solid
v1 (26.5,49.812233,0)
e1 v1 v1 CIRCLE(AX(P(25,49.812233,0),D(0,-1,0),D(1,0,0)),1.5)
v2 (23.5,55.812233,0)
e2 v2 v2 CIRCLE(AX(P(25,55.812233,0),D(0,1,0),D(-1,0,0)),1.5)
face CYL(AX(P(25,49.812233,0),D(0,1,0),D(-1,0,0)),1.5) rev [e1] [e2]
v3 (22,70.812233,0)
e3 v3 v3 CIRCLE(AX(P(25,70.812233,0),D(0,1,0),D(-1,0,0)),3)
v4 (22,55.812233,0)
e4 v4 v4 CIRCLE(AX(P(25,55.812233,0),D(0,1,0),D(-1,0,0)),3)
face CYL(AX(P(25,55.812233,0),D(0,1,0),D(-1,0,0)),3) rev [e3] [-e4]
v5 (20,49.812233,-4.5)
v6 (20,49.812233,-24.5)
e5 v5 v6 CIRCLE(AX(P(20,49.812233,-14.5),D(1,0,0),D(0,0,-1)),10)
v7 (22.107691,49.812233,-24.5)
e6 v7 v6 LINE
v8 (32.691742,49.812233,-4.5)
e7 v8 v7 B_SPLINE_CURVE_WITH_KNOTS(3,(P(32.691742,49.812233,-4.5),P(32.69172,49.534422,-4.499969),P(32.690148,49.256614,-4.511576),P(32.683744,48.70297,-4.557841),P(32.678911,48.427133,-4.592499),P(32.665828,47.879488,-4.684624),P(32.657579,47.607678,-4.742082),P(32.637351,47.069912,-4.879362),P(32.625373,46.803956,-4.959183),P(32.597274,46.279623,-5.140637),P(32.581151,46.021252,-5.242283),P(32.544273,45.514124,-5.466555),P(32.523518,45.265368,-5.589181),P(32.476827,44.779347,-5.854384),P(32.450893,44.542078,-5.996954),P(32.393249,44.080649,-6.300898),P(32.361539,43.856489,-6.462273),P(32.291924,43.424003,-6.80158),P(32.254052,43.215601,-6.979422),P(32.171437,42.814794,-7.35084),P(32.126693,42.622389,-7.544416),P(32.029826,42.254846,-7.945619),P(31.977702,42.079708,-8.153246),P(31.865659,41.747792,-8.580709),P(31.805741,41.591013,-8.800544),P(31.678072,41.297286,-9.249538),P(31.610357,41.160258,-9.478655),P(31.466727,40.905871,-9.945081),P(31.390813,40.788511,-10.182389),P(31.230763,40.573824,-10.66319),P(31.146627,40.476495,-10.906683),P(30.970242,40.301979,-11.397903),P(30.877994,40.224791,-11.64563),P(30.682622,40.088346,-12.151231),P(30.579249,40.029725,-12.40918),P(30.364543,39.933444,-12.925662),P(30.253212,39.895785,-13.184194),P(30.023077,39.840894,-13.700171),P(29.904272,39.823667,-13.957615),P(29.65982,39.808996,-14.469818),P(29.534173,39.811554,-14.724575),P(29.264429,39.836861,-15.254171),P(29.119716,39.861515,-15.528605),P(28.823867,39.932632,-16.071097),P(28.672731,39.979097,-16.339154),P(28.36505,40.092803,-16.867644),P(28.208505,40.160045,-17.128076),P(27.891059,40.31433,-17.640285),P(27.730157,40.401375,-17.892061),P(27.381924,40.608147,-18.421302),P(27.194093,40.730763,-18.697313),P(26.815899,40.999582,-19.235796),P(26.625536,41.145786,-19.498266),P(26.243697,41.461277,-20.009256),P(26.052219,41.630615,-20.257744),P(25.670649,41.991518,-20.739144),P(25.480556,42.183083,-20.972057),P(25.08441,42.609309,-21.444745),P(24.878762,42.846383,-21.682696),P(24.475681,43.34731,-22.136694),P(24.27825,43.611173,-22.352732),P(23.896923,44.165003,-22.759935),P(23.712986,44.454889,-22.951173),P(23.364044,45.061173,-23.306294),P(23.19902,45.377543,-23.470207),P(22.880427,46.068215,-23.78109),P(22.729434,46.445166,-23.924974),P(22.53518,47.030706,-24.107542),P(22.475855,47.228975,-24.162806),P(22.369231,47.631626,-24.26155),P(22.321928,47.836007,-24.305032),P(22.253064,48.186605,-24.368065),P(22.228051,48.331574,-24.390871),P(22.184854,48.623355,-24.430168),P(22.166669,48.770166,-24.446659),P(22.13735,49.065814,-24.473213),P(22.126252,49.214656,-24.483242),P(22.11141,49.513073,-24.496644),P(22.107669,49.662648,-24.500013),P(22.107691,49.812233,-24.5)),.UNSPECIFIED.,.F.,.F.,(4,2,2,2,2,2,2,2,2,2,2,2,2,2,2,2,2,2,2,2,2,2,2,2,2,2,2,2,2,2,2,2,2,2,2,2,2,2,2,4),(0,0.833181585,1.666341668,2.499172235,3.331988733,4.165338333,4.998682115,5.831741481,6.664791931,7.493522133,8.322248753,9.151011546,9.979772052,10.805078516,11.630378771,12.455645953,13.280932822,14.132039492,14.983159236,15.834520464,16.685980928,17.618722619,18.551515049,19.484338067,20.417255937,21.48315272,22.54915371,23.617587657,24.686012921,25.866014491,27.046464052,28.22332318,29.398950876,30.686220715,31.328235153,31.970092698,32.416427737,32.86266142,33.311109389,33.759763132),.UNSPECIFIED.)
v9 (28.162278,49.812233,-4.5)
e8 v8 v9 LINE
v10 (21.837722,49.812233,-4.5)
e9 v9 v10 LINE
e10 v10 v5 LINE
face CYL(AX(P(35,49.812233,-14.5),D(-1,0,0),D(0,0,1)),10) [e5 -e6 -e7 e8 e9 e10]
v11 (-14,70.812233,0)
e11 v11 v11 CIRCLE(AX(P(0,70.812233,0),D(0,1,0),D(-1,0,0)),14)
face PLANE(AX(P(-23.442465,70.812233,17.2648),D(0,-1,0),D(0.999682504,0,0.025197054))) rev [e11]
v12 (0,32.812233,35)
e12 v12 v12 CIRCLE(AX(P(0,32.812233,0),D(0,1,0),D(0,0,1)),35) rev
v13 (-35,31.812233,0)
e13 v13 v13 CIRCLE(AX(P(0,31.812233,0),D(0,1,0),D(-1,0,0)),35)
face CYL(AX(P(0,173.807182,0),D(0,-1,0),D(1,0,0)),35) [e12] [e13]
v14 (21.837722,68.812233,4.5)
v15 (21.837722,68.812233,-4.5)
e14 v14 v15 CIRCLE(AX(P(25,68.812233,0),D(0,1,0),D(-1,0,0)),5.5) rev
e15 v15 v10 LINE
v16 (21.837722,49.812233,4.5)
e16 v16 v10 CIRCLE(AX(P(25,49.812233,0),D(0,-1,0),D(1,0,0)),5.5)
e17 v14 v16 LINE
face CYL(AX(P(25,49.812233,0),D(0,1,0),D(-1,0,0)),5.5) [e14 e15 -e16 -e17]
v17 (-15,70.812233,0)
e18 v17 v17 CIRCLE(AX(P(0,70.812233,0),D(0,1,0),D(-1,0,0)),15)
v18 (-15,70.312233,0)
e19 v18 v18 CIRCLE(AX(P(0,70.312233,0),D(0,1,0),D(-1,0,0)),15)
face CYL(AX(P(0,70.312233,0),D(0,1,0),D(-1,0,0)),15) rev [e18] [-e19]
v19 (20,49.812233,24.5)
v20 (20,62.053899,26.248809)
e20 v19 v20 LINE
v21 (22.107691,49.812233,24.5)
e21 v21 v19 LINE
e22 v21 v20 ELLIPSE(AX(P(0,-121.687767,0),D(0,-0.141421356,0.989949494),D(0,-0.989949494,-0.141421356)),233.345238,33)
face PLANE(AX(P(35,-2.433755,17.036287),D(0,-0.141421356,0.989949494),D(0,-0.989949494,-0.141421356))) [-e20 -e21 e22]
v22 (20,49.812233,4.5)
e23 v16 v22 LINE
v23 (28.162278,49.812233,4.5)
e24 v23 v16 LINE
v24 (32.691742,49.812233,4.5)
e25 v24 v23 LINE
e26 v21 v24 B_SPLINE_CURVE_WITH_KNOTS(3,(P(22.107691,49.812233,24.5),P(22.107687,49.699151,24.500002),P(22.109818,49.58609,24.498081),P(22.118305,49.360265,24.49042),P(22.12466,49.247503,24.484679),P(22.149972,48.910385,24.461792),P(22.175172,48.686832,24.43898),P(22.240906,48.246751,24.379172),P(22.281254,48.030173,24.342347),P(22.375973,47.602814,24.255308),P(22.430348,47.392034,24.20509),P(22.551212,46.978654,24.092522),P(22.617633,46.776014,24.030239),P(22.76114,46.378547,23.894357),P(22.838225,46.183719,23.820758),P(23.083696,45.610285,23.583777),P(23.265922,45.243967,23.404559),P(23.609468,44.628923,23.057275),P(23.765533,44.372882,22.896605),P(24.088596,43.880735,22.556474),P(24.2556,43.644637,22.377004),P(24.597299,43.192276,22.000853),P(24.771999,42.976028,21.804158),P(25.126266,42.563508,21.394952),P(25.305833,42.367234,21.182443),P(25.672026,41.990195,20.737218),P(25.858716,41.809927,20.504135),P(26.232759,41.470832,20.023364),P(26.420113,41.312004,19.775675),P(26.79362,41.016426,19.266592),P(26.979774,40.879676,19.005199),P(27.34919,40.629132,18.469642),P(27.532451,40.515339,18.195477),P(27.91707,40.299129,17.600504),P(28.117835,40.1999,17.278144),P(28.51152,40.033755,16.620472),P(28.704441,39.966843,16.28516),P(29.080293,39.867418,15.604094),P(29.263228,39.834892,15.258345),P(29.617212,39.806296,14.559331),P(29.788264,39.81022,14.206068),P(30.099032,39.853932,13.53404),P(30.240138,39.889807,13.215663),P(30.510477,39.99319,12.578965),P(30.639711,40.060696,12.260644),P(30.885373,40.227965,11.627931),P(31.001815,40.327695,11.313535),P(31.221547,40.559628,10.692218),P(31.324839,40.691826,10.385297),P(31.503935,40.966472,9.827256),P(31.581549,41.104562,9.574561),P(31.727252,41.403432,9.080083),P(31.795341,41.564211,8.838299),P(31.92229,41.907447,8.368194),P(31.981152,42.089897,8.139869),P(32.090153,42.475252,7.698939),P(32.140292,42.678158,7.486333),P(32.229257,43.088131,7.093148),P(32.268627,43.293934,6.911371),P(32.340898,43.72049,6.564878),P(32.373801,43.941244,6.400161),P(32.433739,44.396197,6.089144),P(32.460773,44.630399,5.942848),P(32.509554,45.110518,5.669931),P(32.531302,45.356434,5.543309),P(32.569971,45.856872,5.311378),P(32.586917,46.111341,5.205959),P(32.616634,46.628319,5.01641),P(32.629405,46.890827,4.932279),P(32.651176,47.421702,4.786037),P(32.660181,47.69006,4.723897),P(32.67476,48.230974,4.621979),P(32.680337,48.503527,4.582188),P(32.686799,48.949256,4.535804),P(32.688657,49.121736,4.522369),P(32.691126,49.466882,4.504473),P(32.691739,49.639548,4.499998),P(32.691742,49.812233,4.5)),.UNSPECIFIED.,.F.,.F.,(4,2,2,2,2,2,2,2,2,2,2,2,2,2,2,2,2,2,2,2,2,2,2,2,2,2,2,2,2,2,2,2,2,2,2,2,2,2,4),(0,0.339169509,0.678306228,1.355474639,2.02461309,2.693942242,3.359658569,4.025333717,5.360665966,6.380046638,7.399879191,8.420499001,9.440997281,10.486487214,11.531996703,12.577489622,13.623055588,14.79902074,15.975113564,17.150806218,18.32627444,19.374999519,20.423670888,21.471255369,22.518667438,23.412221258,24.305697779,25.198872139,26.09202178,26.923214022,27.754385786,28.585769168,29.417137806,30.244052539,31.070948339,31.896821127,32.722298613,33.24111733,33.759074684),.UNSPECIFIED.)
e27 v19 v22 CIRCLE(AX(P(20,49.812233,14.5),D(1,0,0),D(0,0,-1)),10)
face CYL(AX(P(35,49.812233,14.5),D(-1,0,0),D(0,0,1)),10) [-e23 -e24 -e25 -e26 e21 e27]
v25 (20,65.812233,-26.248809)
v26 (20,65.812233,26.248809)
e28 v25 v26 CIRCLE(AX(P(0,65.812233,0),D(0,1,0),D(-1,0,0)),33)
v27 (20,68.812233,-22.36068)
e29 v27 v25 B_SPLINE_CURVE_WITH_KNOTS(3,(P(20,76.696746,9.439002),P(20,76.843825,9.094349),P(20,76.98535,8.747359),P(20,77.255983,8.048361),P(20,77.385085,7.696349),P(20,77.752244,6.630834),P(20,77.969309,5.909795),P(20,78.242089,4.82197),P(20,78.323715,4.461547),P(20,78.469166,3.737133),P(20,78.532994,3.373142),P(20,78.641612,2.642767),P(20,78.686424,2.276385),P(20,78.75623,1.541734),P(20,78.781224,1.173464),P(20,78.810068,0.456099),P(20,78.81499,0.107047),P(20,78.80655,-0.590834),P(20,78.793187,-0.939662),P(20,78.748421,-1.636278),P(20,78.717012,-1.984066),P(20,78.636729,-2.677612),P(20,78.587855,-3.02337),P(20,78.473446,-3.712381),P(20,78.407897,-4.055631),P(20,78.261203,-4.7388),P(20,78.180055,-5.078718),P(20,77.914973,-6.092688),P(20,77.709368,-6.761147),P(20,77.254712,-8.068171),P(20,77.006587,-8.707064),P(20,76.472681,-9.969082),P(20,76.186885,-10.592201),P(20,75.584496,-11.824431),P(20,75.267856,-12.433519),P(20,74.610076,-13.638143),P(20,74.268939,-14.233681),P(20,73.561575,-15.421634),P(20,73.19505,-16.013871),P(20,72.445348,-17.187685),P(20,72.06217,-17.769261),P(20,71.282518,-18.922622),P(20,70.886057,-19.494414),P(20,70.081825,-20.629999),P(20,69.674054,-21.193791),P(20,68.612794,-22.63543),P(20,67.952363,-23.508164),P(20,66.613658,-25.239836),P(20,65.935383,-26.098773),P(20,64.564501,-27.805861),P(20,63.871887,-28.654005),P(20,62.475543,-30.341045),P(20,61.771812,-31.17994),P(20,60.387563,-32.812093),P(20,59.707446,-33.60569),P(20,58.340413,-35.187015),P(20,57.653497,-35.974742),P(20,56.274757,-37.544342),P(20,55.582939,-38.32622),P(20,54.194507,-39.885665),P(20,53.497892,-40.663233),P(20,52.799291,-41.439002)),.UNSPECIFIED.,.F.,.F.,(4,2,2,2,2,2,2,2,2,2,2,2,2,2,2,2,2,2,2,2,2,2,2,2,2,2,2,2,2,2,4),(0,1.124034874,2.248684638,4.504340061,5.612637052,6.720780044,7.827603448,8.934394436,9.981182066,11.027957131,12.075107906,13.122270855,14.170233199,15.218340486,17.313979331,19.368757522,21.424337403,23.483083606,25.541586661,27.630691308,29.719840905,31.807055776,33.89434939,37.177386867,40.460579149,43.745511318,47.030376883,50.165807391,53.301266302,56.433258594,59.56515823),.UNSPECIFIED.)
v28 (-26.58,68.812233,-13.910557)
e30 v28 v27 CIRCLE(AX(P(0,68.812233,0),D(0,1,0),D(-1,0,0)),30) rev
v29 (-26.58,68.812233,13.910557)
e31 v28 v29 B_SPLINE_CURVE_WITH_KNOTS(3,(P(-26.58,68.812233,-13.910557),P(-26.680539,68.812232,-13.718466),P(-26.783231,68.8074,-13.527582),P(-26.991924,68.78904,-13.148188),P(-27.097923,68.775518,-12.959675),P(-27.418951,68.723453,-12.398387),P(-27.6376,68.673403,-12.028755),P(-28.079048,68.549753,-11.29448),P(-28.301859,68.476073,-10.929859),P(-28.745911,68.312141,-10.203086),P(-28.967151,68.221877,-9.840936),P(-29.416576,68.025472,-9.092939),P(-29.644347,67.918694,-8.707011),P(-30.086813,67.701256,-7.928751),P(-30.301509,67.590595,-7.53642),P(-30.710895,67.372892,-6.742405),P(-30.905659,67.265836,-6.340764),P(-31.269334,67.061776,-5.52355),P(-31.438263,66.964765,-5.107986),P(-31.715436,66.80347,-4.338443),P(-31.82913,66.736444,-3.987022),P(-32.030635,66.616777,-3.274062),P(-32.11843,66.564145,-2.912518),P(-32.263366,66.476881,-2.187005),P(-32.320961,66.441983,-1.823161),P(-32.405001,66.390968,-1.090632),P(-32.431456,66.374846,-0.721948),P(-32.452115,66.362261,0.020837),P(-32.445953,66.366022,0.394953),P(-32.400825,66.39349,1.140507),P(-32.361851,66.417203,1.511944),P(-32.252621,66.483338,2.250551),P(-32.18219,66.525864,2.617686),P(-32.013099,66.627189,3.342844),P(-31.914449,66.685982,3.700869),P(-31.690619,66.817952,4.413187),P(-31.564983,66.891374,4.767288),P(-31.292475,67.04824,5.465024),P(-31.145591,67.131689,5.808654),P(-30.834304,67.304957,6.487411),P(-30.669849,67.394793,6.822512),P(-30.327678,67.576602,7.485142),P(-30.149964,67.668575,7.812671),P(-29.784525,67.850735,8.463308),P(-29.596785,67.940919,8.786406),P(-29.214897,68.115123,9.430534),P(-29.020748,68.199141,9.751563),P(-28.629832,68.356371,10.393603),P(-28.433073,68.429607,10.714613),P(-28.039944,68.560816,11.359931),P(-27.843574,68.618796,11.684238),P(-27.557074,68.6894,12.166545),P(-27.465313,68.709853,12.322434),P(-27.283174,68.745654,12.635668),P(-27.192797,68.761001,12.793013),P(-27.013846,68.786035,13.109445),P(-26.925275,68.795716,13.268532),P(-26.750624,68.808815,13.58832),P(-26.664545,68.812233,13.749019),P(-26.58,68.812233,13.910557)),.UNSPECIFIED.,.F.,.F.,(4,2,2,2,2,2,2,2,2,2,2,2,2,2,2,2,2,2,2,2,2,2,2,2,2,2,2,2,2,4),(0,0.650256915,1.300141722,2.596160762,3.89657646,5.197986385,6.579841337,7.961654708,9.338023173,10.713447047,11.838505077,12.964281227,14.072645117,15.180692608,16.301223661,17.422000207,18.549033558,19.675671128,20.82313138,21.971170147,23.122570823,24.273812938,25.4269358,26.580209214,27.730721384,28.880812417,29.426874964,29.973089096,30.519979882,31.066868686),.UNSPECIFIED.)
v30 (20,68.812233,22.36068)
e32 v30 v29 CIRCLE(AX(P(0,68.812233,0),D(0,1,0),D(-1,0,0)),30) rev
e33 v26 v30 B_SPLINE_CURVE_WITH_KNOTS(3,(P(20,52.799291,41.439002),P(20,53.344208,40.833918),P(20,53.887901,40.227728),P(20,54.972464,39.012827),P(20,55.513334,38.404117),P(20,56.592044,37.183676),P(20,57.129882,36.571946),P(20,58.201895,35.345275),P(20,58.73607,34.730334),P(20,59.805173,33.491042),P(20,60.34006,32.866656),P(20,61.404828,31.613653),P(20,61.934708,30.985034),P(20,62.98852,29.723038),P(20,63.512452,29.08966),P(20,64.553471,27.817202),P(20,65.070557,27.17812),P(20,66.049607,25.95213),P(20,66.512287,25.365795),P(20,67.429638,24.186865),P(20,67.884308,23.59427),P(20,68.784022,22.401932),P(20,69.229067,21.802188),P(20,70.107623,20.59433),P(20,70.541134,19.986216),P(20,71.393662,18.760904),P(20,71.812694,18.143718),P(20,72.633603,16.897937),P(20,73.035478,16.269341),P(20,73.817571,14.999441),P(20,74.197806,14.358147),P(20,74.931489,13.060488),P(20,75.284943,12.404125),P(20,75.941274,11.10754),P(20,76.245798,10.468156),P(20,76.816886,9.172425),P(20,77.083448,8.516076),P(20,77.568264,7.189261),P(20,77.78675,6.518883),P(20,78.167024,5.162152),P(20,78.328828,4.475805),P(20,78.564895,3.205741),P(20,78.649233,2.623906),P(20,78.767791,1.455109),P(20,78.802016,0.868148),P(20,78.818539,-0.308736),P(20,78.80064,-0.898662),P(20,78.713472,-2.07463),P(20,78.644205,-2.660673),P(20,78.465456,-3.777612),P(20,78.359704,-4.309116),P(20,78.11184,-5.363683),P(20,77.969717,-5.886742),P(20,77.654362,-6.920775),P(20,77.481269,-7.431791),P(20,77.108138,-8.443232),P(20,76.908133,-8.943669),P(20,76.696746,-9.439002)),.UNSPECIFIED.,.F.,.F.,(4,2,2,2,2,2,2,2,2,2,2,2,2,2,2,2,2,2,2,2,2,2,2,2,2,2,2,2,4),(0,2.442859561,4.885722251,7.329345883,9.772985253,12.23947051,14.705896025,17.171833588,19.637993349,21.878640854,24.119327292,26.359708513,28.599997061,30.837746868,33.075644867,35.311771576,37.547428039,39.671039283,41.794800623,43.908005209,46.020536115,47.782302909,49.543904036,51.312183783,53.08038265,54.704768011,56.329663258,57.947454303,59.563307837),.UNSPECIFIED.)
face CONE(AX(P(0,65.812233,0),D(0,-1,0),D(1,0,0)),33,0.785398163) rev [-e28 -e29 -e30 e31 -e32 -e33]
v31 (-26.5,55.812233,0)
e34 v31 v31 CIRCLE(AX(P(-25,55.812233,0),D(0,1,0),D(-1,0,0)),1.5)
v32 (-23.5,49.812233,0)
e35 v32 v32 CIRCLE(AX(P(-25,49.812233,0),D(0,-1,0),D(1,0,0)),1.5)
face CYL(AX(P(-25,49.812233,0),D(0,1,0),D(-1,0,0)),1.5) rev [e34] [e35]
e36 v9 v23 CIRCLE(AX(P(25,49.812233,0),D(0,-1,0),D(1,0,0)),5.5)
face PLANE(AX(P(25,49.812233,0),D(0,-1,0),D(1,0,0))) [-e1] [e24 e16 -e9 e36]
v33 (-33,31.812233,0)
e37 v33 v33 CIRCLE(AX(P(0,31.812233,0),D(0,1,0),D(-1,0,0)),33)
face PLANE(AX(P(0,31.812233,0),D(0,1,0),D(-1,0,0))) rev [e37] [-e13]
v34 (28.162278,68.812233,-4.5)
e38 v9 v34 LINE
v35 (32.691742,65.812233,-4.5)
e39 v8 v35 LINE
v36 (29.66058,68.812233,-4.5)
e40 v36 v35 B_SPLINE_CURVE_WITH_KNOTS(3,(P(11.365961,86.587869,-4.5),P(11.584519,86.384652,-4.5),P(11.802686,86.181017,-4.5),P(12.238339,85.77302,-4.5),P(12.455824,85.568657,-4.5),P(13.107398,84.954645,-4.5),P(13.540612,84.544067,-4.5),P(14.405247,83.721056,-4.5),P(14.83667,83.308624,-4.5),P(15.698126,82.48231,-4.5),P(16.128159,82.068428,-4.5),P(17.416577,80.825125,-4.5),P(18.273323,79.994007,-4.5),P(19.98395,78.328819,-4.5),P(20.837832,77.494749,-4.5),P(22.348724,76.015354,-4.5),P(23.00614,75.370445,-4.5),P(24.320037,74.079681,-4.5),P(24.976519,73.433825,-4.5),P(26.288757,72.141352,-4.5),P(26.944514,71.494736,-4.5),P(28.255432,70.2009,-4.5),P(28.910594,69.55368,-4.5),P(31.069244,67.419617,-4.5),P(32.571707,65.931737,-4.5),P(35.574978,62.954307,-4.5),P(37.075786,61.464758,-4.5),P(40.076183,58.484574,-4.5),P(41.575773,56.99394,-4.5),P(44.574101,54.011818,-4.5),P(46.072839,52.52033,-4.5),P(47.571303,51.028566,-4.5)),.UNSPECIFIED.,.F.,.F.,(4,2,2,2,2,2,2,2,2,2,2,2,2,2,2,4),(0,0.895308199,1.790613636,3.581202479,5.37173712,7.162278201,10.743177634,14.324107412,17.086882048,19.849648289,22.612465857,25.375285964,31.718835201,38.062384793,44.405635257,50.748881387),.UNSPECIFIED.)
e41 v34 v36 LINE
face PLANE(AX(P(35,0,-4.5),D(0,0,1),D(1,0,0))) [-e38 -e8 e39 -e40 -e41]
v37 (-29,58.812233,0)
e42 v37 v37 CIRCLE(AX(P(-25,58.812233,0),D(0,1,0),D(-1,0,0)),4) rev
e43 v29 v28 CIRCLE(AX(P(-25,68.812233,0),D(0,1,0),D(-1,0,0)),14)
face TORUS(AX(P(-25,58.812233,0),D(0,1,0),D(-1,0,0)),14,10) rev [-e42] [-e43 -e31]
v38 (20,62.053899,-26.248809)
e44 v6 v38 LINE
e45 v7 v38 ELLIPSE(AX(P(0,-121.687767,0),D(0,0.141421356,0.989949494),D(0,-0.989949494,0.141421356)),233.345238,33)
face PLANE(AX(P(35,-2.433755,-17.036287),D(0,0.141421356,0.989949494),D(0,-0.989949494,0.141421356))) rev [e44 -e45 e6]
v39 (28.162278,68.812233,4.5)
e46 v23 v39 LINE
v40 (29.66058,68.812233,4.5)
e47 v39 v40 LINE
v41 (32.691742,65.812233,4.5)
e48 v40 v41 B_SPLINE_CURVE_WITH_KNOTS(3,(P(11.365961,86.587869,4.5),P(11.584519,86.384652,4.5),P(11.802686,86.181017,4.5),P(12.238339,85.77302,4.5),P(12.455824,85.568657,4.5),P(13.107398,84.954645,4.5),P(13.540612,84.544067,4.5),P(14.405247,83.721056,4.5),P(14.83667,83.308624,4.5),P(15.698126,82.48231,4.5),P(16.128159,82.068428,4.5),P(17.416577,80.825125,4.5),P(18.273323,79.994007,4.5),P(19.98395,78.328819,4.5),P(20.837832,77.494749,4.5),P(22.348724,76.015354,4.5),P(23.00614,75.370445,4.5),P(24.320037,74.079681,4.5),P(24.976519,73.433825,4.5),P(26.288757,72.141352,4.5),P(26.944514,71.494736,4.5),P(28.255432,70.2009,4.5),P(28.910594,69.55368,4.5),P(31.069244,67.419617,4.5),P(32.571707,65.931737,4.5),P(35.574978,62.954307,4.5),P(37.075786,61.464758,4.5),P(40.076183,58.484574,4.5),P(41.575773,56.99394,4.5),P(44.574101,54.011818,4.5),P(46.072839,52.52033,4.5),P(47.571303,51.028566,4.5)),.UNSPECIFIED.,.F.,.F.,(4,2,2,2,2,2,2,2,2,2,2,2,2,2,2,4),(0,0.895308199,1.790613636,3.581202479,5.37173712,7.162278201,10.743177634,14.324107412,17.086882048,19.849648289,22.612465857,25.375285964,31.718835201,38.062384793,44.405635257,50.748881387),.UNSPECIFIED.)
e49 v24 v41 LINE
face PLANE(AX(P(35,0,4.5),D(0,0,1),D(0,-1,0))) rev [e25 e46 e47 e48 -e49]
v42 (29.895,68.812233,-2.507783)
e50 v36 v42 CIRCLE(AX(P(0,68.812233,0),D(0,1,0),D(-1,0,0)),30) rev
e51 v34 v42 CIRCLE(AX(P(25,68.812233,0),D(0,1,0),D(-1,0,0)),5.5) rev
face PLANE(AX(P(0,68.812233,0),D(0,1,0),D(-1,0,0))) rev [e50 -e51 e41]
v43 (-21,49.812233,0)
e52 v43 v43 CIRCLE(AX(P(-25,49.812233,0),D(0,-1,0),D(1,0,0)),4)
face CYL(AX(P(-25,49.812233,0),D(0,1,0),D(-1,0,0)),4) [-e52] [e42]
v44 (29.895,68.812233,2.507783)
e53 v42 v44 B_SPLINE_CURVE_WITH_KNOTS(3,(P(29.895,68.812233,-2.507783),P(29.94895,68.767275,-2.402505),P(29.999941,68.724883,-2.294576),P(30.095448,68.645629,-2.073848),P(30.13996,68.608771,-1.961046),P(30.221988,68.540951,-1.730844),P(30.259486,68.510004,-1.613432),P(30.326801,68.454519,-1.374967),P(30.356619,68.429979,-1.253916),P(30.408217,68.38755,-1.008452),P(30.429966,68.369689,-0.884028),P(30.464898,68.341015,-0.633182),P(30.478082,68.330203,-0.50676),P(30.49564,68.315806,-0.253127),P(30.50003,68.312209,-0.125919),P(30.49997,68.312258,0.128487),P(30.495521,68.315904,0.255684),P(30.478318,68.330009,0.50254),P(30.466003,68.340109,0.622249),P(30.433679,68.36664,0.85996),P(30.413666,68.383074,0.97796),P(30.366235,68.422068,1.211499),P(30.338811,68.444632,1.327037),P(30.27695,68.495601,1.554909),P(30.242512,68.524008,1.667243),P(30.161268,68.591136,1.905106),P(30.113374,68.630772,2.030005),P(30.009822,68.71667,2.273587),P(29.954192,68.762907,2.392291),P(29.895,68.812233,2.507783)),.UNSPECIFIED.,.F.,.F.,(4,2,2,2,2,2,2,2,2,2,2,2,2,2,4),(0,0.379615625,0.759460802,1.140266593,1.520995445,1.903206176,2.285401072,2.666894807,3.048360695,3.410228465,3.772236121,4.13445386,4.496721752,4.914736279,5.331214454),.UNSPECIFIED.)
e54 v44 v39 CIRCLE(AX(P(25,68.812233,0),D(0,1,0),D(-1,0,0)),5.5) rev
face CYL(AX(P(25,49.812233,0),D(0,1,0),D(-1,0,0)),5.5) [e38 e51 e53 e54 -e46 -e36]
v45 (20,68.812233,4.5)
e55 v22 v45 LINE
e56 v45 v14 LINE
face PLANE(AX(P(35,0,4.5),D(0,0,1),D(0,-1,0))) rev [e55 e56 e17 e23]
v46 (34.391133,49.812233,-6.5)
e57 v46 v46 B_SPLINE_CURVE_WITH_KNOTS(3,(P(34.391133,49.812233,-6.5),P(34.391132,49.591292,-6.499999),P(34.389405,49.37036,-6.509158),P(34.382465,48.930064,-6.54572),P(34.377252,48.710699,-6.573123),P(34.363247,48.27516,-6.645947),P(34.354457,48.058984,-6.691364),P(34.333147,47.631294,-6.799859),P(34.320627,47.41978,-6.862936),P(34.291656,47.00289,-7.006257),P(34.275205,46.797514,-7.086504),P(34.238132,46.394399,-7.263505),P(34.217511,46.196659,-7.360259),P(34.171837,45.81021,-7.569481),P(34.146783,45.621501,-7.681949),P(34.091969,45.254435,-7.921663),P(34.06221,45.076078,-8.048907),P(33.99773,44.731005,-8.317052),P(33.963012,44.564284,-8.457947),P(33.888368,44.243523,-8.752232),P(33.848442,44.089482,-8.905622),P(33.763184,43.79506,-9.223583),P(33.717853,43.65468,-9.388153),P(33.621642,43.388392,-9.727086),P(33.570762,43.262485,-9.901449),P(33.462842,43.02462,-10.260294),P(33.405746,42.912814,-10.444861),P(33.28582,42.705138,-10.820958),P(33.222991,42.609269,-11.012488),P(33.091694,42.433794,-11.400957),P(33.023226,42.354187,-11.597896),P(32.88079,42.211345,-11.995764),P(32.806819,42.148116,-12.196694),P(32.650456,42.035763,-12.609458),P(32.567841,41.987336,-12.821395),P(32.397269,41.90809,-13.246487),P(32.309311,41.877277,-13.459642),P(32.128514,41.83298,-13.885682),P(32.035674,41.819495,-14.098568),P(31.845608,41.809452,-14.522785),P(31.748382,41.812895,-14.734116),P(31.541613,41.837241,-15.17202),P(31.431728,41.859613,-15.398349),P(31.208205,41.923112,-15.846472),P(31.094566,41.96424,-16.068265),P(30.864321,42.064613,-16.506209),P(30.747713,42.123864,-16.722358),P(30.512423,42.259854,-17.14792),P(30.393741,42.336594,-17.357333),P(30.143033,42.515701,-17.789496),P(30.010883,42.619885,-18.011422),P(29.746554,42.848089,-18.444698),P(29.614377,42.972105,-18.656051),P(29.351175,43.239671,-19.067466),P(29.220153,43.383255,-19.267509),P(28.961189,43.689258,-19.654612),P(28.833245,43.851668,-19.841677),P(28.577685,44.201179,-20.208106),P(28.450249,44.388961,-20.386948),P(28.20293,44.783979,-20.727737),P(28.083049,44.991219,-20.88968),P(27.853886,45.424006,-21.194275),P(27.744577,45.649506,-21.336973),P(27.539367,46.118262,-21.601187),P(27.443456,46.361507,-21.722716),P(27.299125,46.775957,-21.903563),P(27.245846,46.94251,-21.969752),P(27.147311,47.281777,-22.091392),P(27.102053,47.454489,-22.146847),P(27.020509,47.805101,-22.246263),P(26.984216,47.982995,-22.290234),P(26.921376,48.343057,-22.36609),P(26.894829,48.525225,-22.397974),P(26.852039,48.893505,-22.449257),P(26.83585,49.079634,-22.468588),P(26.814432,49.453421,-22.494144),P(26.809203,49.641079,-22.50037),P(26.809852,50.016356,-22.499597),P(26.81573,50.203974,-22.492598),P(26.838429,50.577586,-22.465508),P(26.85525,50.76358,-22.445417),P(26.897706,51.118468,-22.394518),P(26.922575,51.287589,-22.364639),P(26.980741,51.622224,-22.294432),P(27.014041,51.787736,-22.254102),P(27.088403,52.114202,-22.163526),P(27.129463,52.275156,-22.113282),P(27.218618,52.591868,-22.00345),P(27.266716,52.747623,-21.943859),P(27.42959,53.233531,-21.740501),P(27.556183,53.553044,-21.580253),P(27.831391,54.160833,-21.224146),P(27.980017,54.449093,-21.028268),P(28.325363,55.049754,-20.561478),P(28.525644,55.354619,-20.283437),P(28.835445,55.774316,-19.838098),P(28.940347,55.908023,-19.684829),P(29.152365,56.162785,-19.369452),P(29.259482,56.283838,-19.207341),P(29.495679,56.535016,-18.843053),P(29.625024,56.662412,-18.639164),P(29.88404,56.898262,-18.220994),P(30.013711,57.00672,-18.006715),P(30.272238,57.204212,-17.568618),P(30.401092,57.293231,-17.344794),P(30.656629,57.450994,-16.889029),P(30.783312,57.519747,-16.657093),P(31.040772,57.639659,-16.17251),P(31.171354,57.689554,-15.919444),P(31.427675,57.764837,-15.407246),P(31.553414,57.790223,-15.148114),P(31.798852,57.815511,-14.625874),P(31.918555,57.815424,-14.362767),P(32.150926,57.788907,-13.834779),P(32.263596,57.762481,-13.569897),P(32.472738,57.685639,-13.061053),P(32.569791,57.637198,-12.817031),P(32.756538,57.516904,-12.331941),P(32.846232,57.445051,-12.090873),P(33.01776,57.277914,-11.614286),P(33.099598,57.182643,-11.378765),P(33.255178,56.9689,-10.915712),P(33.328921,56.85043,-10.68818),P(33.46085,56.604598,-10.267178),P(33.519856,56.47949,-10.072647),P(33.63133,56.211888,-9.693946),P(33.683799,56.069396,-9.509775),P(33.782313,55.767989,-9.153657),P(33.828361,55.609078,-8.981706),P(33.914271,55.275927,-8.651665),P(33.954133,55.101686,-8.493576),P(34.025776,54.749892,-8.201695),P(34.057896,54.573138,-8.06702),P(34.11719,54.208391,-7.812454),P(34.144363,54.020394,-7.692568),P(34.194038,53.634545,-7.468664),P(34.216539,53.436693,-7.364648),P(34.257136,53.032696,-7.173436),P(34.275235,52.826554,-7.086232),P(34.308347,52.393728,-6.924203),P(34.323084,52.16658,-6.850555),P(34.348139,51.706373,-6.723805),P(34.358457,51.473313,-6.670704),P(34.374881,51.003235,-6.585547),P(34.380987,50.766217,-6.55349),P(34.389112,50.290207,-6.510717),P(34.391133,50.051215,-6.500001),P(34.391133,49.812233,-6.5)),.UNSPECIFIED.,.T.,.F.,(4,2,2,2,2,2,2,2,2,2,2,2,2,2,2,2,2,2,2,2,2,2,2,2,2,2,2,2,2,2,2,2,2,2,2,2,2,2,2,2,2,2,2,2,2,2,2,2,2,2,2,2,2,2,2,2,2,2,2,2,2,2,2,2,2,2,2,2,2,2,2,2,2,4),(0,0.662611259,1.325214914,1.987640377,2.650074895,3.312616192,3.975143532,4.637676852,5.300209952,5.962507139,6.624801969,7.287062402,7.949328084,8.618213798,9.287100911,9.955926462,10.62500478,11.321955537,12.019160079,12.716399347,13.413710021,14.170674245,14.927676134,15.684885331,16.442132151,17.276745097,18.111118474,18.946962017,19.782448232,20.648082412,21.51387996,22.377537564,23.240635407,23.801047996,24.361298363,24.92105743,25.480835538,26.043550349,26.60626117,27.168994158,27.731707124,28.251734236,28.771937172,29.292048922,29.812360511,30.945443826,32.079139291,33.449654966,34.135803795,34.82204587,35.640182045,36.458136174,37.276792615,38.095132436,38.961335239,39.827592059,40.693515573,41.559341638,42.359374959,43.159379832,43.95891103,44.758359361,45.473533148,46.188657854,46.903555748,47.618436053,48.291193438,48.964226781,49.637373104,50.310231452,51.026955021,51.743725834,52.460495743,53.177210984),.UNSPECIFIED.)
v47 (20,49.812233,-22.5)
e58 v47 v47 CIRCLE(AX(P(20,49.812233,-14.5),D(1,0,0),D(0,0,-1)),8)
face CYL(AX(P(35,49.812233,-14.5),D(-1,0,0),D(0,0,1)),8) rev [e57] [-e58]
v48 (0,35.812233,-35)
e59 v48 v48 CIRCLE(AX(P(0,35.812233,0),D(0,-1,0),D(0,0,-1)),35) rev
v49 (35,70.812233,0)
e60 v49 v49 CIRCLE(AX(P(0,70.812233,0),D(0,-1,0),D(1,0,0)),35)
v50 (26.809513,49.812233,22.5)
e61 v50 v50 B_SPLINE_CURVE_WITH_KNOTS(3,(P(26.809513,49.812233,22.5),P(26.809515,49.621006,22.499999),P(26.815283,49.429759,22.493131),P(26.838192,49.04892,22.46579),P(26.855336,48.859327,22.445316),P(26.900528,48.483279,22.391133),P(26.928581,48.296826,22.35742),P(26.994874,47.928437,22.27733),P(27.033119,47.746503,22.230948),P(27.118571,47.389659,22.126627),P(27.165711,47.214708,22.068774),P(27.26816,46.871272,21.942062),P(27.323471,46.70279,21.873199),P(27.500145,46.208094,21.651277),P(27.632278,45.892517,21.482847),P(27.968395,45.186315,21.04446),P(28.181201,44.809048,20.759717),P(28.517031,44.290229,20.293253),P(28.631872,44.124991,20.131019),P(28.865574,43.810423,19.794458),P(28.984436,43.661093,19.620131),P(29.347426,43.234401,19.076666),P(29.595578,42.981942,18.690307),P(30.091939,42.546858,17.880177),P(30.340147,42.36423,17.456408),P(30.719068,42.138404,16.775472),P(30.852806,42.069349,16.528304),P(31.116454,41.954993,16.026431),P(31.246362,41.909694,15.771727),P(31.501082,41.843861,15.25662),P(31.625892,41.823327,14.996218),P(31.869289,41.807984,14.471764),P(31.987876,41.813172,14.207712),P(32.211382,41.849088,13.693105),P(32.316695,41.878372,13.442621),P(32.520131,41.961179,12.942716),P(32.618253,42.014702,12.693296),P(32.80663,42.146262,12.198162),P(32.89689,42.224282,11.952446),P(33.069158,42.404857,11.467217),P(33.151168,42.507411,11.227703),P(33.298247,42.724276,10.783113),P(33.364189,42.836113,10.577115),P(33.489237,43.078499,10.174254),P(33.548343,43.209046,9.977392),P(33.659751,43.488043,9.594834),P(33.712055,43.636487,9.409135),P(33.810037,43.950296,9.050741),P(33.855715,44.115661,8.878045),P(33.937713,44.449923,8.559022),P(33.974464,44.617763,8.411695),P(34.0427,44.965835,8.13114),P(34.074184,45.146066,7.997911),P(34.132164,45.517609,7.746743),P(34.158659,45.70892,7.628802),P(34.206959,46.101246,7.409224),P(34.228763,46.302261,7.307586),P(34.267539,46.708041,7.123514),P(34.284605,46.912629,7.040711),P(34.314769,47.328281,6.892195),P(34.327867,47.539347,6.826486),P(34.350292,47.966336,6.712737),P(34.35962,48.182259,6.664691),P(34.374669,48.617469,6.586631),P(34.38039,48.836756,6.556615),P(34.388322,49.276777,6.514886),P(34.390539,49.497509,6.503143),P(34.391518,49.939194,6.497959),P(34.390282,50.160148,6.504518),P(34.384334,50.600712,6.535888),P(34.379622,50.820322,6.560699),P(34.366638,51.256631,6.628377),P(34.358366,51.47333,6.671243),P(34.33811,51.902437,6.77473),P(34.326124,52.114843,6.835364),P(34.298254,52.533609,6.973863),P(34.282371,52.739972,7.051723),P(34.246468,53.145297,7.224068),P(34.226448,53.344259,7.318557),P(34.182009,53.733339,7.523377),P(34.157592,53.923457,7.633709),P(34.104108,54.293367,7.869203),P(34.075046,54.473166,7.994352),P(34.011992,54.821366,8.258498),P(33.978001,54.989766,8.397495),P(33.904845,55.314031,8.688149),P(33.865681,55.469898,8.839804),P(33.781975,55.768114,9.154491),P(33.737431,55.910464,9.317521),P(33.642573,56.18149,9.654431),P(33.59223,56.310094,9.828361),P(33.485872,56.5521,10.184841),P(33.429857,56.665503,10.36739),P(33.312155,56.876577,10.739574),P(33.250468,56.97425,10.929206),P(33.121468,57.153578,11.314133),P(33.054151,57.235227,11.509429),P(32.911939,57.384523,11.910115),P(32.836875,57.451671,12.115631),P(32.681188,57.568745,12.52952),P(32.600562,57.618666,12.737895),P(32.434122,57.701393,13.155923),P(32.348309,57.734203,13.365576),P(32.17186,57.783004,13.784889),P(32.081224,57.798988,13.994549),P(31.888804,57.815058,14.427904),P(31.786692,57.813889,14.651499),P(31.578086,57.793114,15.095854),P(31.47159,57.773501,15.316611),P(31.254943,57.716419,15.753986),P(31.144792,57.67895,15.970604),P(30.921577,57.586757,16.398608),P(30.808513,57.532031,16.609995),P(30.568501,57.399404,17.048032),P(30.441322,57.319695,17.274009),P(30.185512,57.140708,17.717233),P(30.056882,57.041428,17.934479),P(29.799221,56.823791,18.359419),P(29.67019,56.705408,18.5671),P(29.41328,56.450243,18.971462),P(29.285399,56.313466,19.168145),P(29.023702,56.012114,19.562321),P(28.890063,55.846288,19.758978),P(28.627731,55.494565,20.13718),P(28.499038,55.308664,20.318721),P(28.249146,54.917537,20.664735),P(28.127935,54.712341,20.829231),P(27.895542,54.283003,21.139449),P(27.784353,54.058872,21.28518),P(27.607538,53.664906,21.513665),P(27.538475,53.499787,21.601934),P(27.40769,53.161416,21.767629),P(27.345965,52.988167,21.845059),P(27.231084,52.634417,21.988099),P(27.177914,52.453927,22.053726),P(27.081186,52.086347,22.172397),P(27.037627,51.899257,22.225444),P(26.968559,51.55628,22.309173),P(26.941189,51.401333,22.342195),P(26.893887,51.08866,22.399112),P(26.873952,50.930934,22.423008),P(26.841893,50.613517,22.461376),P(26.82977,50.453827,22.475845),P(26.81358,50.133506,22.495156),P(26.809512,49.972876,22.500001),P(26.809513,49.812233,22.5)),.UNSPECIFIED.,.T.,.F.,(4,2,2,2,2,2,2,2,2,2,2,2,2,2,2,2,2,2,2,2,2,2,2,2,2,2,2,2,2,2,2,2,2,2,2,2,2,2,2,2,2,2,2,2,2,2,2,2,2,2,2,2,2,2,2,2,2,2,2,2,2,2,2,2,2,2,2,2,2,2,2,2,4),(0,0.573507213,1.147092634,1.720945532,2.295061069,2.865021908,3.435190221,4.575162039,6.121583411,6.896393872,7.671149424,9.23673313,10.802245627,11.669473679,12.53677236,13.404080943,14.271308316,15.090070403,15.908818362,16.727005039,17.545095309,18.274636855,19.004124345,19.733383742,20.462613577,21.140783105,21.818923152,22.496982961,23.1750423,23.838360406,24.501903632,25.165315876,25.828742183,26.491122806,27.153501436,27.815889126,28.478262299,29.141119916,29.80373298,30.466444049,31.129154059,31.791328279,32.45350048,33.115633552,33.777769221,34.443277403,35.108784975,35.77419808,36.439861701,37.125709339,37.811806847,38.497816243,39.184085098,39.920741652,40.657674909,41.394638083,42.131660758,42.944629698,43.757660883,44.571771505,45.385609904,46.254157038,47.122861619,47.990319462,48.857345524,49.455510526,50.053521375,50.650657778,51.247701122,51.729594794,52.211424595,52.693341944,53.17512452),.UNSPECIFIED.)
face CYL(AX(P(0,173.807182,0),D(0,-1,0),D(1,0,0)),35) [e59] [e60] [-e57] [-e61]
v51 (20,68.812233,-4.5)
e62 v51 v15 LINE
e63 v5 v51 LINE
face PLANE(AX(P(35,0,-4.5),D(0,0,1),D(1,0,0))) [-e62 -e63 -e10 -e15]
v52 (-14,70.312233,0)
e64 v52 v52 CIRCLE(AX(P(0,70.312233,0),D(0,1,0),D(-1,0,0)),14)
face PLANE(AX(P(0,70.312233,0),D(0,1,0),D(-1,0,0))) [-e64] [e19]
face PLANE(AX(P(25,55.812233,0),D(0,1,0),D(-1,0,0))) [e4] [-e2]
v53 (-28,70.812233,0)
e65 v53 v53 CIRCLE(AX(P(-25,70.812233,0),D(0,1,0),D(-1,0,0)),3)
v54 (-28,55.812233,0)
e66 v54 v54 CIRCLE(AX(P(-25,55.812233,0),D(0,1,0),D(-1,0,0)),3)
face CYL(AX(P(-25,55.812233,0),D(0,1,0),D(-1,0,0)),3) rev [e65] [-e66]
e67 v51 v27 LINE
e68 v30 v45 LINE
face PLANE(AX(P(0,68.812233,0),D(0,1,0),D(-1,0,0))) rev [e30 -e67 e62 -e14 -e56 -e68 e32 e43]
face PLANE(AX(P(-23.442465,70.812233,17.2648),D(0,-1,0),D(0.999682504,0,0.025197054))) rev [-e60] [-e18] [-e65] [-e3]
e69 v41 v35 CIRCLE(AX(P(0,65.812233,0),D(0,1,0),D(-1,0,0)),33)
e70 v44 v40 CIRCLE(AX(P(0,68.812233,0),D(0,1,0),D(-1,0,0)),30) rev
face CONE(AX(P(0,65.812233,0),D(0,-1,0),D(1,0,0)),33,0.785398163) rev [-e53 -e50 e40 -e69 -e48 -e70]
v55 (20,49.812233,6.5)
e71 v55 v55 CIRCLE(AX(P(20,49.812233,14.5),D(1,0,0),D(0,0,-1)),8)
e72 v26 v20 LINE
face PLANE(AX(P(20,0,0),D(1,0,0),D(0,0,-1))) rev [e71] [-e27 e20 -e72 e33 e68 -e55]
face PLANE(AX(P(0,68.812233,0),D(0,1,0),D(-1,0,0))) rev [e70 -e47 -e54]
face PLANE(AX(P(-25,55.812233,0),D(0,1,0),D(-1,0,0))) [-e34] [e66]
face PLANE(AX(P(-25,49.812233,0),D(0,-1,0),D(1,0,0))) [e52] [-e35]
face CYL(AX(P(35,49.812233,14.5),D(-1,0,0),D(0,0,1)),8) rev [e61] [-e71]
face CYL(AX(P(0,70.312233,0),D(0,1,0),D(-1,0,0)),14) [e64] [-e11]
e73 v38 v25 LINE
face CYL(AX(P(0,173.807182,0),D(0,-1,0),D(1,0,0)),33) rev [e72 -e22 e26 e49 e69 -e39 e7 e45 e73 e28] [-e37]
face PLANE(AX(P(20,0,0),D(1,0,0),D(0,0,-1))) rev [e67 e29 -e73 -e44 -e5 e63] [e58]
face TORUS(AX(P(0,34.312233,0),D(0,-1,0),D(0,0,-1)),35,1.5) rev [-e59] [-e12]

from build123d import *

# Parameters (mm, degrees)
SKETCH2_R           = 35
SKETCH2_R_2         = 33
BOSS_EXTRUDE1_DEPTH = 39
BOSS_EXTRUDE2_START = -2
SKETCH3_R           = 35
BOSS_EXTRUDE2_DEPTH = 2
SKETCH7_R           = 5.5
SKETCH7_R_2         = 1.5
SKETCH7_R_3         = 4
BOSS_EXTRUDE4_DEPTH = 19
SKETCH8_R           = 3
CUT_EXTRUDE3_DEPTH  = 15
CHAMFER1_SIZE       = 3
SKETCH9_R           = 15
SKETCH9_R_2         = 14
CUT_EXTRUDE4_DEPTH  = 0.5
SKETCH10_R          = 1.5
SKETCH11_R          = 8
CUT_EXTRUDE5_DEPTH  = 87.396599101
SKETCH12_R          = 10
SKETCH12_R_2        = 8
BOSS_EXTRUDE5_DEPTH = 15
SKETCH13_R          = 55
SKETCH13_R_2        = 35
CUT_EXTRUDE6_DEPTH  = 64.01587119
FILLET1_R           = 10


with BuildPart() as part:
    # Sketch2 → Boss-Extrude1 (new body)
    with BuildSketch(Plane(origin=(0, 31.812232957, 0), x_dir=(1, 0, 0), z_dir=(0, 1, 0))):
        Circle(SKETCH2_R)
        Circle(SKETCH2_R_2, mode=Mode.SUBTRACT)
    extrude(amount=BOSS_EXTRUDE1_DEPTH)

    # Sketch3 → Boss-Extrude2 (add)
    with BuildSketch(Plane(origin=(0, 70.812232957, 0), x_dir=(1, 0, 0), z_dir=(0, 1, 0)).offset(BOSS_EXTRUDE2_START)):
        Circle(SKETCH3_R)
    extrude(amount=BOSS_EXTRUDE2_DEPTH)

    # Sketch7 → Boss-Extrude4 (add)
    # profile 1 of 2: a face of its own
    with BuildSketch(Plane.XZ.offset(-68.812232957)):
        with Locations(Location((25, 0, 0), (0, 0, 180))):
            Circle(SKETCH7_R)
        with Locations((25, 0)):
            Circle(SKETCH7_R_2, mode=Mode.SUBTRACT)
    # profile 2 of 2: a face of its own
    with BuildSketch(Plane.XZ.offset(-68.812232957)):
        with Locations(Location((-25, 0, 0), (0, 0, 180))):
            Circle(SKETCH7_R_3)
        with Locations((-25, 0)):
            Circle(SKETCH7_R_2, mode=Mode.SUBTRACT)
    extrude(amount=BOSS_EXTRUDE4_DEPTH)

    # Sketch8 → Cut-Extrude3 (cut)
    with BuildSketch(Plane(origin=(0, 70.812232957, 0), x_dir=(1, 0, 0), z_dir=(0, 1, 0))):
        with Locations(Location((25, 0, 0), (0, 0, 180))):
            Circle(SKETCH8_R)
        with Locations(Location((-25, 0, 0), (0, 0, 180))):
            Circle(SKETCH8_R)
    extrude(amount=-CUT_EXTRUDE3_DEPTH, mode=Mode.SUBTRACT)

    # Chamfer1
    # the kernel refuses this chamfer: 3 mm, written as the material it adds along each edge
    with BuildSketch(Plane(origin=(0, 68.812232957, 0), x_dir=(1, 0, 0), z_dir=(0, 0, -1))) as chamfer1_piece_1:
        Polygon((33, CHAMFER1_SIZE), (33 - CHAMFER1_SIZE, 0), (33, 0), align=None)
    revolve(axis=Axis((0, 68.812232957, 0), (0, -1, 0)))

    # Sketch9 → Cut-Extrude4 (cut)
    with BuildSketch(Plane(origin=(0, 70.812232957, 0), x_dir=(1, 0, 0), z_dir=(0, 1, 0))):
        with Locations(Location((0, 0, 0), (0, 0, 180))):
            Circle(SKETCH9_R)
        with Locations(Location((0, 0, 0), (0, 0, 180))):
            Circle(SKETCH9_R_2, mode=Mode.SUBTRACT)
    extrude(amount=-CUT_EXTRUDE4_DEPTH, mode=Mode.SUBTRACT)

    # Sketch10 → Cut-Revolve1 (revolve, cut)
    with BuildSketch(Plane.XY, mode=Mode.PRIVATE) as cut_revolve1_sk:
        with Locations((35, 34.312232957)):
            Circle(SKETCH10_R)
    revolve(cut_revolve1_sk.sketch.rotate(Axis((0, 31.812232957, 0), (0, 1, 0)), 4.795108108), axis=Axis((0, 31.812232957, 0), (0, 1, 0)), mode=Mode.SUBTRACT)

    # Sketch11 → Cut-Extrude5 (cut, through all)
    with BuildSketch(Plane(origin=(0, 0, 0), x_dir=(0, 0, -1), z_dir=(1, 0, 0))):
        with Locations(Location((14.5, 49.812232957, 0), (0, 0, 180))):
            Circle(SKETCH11_R)
        with Locations(Location((-14.5, 49.812232957, 0), (0, 0, 180))):
            Circle(SKETCH11_R)
    extrude(amount=CUT_EXTRUDE5_DEPTH, mode=Mode.SUBTRACT)

    # Sketch12 → Boss-Extrude5 (add)
    # profile 1 of 4: a face of its own
    with BuildSketch(Plane(origin=(20, 0, 0), x_dir=(0, 0, -1), z_dir=(1, 0, 0))):
        with BuildLine():
            Line((-27.5, 70.812232957), (-24.5, 49.812232957))
            ThreePointArc((-24.5, 49.812232957), (-14.5, 59.812232957), (-4.5, 49.812232957))
            Line((-4.5, 49.812232957), (-4.5, 70.812232957))
            Line((-4.5, 70.812232957), (-27.5, 70.812232957))
        make_face()
    # profile 2 of 4: a face of its own
    with BuildSketch(Plane(origin=(20, 0, 0), x_dir=(0, 0, -1), z_dir=(1, 0, 0))):
        with Locations((-14.5, 49.812232957)):
            Circle(SKETCH12_R)
        with Locations((-14.5, 49.812232957)):
            Circle(SKETCH12_R_2, mode=Mode.SUBTRACT)
    # profile 3 of 4: a face of its own
    with BuildSketch(Plane(origin=(20, 0, 0), x_dir=(0, 0, -1), z_dir=(1, 0, 0))):
        with Locations((14.5, 49.812232957)):
            Circle(SKETCH12_R)
        with Locations((14.5, 49.812232957)):
            Circle(SKETCH12_R_2, mode=Mode.SUBTRACT)
    # profile 4 of 4: a face of its own
    with BuildSketch(Plane(origin=(20, 0, 0), x_dir=(0, 0, -1), z_dir=(1, 0, 0))):
        with BuildLine():
            ThreePointArc((4.5, 49.812232957), (14.5, 59.812232957), (24.5, 49.812232957))
            Line((24.5, 49.812232957), (27.5, 70.812232957))
            Line((27.5, 70.812232957), (4.5, 70.812232957))
            Line((4.5, 70.812232957), (4.5, 49.812232957))
        make_face()
    extrude(amount=BOSS_EXTRUDE5_DEPTH)

    # Sketch13 → Cut-Extrude6 (cut, through all)
    with BuildSketch(Plane(origin=(0, 70.812232957, 0), x_dir=(1, 0, 0), z_dir=(0, 1, 0))):
        Circle(SKETCH13_R)
        Circle(SKETCH13_R_2, mode=Mode.SUBTRACT)
    extrude(amount=-CUT_EXTRUDE6_DEPTH, mode=Mode.SUBTRACT)

    # Fillet1
    # the kernel refuses this fillet: 10 mm, written as the material it adds along each edge
    with BuildSketch(Plane(origin=(-25, 68.812232957, 0), x_dir=(-1, 0, 0), z_dir=(0, 0, 1))) as fillet1_piece_1_section:
        with BuildLine():
            CenterArc((4 + FILLET1_R, FILLET1_R), FILLET1_R, 180, 90)
            Line((4 + FILLET1_R, 0), (4, 0))
            Line((4, 0), (4, FILLET1_R))
        make_face()
    fillet1_piece_1 = revolve(axis=Axis((-25, 68.812232957, 0), (0, -1, 0)), mode=Mode.PRIVATE)
    fillet1_piece_1 = fillet1_piece_1 & Plane(origin=(0, 65.946902584, 0), x_dir=(1, 0, 0), z_dir=(0, -1, 0)) * Cylinder(35, 56, mode=Mode.PRIVATE)
    add(fillet1_piece_1)


solid = part.part
